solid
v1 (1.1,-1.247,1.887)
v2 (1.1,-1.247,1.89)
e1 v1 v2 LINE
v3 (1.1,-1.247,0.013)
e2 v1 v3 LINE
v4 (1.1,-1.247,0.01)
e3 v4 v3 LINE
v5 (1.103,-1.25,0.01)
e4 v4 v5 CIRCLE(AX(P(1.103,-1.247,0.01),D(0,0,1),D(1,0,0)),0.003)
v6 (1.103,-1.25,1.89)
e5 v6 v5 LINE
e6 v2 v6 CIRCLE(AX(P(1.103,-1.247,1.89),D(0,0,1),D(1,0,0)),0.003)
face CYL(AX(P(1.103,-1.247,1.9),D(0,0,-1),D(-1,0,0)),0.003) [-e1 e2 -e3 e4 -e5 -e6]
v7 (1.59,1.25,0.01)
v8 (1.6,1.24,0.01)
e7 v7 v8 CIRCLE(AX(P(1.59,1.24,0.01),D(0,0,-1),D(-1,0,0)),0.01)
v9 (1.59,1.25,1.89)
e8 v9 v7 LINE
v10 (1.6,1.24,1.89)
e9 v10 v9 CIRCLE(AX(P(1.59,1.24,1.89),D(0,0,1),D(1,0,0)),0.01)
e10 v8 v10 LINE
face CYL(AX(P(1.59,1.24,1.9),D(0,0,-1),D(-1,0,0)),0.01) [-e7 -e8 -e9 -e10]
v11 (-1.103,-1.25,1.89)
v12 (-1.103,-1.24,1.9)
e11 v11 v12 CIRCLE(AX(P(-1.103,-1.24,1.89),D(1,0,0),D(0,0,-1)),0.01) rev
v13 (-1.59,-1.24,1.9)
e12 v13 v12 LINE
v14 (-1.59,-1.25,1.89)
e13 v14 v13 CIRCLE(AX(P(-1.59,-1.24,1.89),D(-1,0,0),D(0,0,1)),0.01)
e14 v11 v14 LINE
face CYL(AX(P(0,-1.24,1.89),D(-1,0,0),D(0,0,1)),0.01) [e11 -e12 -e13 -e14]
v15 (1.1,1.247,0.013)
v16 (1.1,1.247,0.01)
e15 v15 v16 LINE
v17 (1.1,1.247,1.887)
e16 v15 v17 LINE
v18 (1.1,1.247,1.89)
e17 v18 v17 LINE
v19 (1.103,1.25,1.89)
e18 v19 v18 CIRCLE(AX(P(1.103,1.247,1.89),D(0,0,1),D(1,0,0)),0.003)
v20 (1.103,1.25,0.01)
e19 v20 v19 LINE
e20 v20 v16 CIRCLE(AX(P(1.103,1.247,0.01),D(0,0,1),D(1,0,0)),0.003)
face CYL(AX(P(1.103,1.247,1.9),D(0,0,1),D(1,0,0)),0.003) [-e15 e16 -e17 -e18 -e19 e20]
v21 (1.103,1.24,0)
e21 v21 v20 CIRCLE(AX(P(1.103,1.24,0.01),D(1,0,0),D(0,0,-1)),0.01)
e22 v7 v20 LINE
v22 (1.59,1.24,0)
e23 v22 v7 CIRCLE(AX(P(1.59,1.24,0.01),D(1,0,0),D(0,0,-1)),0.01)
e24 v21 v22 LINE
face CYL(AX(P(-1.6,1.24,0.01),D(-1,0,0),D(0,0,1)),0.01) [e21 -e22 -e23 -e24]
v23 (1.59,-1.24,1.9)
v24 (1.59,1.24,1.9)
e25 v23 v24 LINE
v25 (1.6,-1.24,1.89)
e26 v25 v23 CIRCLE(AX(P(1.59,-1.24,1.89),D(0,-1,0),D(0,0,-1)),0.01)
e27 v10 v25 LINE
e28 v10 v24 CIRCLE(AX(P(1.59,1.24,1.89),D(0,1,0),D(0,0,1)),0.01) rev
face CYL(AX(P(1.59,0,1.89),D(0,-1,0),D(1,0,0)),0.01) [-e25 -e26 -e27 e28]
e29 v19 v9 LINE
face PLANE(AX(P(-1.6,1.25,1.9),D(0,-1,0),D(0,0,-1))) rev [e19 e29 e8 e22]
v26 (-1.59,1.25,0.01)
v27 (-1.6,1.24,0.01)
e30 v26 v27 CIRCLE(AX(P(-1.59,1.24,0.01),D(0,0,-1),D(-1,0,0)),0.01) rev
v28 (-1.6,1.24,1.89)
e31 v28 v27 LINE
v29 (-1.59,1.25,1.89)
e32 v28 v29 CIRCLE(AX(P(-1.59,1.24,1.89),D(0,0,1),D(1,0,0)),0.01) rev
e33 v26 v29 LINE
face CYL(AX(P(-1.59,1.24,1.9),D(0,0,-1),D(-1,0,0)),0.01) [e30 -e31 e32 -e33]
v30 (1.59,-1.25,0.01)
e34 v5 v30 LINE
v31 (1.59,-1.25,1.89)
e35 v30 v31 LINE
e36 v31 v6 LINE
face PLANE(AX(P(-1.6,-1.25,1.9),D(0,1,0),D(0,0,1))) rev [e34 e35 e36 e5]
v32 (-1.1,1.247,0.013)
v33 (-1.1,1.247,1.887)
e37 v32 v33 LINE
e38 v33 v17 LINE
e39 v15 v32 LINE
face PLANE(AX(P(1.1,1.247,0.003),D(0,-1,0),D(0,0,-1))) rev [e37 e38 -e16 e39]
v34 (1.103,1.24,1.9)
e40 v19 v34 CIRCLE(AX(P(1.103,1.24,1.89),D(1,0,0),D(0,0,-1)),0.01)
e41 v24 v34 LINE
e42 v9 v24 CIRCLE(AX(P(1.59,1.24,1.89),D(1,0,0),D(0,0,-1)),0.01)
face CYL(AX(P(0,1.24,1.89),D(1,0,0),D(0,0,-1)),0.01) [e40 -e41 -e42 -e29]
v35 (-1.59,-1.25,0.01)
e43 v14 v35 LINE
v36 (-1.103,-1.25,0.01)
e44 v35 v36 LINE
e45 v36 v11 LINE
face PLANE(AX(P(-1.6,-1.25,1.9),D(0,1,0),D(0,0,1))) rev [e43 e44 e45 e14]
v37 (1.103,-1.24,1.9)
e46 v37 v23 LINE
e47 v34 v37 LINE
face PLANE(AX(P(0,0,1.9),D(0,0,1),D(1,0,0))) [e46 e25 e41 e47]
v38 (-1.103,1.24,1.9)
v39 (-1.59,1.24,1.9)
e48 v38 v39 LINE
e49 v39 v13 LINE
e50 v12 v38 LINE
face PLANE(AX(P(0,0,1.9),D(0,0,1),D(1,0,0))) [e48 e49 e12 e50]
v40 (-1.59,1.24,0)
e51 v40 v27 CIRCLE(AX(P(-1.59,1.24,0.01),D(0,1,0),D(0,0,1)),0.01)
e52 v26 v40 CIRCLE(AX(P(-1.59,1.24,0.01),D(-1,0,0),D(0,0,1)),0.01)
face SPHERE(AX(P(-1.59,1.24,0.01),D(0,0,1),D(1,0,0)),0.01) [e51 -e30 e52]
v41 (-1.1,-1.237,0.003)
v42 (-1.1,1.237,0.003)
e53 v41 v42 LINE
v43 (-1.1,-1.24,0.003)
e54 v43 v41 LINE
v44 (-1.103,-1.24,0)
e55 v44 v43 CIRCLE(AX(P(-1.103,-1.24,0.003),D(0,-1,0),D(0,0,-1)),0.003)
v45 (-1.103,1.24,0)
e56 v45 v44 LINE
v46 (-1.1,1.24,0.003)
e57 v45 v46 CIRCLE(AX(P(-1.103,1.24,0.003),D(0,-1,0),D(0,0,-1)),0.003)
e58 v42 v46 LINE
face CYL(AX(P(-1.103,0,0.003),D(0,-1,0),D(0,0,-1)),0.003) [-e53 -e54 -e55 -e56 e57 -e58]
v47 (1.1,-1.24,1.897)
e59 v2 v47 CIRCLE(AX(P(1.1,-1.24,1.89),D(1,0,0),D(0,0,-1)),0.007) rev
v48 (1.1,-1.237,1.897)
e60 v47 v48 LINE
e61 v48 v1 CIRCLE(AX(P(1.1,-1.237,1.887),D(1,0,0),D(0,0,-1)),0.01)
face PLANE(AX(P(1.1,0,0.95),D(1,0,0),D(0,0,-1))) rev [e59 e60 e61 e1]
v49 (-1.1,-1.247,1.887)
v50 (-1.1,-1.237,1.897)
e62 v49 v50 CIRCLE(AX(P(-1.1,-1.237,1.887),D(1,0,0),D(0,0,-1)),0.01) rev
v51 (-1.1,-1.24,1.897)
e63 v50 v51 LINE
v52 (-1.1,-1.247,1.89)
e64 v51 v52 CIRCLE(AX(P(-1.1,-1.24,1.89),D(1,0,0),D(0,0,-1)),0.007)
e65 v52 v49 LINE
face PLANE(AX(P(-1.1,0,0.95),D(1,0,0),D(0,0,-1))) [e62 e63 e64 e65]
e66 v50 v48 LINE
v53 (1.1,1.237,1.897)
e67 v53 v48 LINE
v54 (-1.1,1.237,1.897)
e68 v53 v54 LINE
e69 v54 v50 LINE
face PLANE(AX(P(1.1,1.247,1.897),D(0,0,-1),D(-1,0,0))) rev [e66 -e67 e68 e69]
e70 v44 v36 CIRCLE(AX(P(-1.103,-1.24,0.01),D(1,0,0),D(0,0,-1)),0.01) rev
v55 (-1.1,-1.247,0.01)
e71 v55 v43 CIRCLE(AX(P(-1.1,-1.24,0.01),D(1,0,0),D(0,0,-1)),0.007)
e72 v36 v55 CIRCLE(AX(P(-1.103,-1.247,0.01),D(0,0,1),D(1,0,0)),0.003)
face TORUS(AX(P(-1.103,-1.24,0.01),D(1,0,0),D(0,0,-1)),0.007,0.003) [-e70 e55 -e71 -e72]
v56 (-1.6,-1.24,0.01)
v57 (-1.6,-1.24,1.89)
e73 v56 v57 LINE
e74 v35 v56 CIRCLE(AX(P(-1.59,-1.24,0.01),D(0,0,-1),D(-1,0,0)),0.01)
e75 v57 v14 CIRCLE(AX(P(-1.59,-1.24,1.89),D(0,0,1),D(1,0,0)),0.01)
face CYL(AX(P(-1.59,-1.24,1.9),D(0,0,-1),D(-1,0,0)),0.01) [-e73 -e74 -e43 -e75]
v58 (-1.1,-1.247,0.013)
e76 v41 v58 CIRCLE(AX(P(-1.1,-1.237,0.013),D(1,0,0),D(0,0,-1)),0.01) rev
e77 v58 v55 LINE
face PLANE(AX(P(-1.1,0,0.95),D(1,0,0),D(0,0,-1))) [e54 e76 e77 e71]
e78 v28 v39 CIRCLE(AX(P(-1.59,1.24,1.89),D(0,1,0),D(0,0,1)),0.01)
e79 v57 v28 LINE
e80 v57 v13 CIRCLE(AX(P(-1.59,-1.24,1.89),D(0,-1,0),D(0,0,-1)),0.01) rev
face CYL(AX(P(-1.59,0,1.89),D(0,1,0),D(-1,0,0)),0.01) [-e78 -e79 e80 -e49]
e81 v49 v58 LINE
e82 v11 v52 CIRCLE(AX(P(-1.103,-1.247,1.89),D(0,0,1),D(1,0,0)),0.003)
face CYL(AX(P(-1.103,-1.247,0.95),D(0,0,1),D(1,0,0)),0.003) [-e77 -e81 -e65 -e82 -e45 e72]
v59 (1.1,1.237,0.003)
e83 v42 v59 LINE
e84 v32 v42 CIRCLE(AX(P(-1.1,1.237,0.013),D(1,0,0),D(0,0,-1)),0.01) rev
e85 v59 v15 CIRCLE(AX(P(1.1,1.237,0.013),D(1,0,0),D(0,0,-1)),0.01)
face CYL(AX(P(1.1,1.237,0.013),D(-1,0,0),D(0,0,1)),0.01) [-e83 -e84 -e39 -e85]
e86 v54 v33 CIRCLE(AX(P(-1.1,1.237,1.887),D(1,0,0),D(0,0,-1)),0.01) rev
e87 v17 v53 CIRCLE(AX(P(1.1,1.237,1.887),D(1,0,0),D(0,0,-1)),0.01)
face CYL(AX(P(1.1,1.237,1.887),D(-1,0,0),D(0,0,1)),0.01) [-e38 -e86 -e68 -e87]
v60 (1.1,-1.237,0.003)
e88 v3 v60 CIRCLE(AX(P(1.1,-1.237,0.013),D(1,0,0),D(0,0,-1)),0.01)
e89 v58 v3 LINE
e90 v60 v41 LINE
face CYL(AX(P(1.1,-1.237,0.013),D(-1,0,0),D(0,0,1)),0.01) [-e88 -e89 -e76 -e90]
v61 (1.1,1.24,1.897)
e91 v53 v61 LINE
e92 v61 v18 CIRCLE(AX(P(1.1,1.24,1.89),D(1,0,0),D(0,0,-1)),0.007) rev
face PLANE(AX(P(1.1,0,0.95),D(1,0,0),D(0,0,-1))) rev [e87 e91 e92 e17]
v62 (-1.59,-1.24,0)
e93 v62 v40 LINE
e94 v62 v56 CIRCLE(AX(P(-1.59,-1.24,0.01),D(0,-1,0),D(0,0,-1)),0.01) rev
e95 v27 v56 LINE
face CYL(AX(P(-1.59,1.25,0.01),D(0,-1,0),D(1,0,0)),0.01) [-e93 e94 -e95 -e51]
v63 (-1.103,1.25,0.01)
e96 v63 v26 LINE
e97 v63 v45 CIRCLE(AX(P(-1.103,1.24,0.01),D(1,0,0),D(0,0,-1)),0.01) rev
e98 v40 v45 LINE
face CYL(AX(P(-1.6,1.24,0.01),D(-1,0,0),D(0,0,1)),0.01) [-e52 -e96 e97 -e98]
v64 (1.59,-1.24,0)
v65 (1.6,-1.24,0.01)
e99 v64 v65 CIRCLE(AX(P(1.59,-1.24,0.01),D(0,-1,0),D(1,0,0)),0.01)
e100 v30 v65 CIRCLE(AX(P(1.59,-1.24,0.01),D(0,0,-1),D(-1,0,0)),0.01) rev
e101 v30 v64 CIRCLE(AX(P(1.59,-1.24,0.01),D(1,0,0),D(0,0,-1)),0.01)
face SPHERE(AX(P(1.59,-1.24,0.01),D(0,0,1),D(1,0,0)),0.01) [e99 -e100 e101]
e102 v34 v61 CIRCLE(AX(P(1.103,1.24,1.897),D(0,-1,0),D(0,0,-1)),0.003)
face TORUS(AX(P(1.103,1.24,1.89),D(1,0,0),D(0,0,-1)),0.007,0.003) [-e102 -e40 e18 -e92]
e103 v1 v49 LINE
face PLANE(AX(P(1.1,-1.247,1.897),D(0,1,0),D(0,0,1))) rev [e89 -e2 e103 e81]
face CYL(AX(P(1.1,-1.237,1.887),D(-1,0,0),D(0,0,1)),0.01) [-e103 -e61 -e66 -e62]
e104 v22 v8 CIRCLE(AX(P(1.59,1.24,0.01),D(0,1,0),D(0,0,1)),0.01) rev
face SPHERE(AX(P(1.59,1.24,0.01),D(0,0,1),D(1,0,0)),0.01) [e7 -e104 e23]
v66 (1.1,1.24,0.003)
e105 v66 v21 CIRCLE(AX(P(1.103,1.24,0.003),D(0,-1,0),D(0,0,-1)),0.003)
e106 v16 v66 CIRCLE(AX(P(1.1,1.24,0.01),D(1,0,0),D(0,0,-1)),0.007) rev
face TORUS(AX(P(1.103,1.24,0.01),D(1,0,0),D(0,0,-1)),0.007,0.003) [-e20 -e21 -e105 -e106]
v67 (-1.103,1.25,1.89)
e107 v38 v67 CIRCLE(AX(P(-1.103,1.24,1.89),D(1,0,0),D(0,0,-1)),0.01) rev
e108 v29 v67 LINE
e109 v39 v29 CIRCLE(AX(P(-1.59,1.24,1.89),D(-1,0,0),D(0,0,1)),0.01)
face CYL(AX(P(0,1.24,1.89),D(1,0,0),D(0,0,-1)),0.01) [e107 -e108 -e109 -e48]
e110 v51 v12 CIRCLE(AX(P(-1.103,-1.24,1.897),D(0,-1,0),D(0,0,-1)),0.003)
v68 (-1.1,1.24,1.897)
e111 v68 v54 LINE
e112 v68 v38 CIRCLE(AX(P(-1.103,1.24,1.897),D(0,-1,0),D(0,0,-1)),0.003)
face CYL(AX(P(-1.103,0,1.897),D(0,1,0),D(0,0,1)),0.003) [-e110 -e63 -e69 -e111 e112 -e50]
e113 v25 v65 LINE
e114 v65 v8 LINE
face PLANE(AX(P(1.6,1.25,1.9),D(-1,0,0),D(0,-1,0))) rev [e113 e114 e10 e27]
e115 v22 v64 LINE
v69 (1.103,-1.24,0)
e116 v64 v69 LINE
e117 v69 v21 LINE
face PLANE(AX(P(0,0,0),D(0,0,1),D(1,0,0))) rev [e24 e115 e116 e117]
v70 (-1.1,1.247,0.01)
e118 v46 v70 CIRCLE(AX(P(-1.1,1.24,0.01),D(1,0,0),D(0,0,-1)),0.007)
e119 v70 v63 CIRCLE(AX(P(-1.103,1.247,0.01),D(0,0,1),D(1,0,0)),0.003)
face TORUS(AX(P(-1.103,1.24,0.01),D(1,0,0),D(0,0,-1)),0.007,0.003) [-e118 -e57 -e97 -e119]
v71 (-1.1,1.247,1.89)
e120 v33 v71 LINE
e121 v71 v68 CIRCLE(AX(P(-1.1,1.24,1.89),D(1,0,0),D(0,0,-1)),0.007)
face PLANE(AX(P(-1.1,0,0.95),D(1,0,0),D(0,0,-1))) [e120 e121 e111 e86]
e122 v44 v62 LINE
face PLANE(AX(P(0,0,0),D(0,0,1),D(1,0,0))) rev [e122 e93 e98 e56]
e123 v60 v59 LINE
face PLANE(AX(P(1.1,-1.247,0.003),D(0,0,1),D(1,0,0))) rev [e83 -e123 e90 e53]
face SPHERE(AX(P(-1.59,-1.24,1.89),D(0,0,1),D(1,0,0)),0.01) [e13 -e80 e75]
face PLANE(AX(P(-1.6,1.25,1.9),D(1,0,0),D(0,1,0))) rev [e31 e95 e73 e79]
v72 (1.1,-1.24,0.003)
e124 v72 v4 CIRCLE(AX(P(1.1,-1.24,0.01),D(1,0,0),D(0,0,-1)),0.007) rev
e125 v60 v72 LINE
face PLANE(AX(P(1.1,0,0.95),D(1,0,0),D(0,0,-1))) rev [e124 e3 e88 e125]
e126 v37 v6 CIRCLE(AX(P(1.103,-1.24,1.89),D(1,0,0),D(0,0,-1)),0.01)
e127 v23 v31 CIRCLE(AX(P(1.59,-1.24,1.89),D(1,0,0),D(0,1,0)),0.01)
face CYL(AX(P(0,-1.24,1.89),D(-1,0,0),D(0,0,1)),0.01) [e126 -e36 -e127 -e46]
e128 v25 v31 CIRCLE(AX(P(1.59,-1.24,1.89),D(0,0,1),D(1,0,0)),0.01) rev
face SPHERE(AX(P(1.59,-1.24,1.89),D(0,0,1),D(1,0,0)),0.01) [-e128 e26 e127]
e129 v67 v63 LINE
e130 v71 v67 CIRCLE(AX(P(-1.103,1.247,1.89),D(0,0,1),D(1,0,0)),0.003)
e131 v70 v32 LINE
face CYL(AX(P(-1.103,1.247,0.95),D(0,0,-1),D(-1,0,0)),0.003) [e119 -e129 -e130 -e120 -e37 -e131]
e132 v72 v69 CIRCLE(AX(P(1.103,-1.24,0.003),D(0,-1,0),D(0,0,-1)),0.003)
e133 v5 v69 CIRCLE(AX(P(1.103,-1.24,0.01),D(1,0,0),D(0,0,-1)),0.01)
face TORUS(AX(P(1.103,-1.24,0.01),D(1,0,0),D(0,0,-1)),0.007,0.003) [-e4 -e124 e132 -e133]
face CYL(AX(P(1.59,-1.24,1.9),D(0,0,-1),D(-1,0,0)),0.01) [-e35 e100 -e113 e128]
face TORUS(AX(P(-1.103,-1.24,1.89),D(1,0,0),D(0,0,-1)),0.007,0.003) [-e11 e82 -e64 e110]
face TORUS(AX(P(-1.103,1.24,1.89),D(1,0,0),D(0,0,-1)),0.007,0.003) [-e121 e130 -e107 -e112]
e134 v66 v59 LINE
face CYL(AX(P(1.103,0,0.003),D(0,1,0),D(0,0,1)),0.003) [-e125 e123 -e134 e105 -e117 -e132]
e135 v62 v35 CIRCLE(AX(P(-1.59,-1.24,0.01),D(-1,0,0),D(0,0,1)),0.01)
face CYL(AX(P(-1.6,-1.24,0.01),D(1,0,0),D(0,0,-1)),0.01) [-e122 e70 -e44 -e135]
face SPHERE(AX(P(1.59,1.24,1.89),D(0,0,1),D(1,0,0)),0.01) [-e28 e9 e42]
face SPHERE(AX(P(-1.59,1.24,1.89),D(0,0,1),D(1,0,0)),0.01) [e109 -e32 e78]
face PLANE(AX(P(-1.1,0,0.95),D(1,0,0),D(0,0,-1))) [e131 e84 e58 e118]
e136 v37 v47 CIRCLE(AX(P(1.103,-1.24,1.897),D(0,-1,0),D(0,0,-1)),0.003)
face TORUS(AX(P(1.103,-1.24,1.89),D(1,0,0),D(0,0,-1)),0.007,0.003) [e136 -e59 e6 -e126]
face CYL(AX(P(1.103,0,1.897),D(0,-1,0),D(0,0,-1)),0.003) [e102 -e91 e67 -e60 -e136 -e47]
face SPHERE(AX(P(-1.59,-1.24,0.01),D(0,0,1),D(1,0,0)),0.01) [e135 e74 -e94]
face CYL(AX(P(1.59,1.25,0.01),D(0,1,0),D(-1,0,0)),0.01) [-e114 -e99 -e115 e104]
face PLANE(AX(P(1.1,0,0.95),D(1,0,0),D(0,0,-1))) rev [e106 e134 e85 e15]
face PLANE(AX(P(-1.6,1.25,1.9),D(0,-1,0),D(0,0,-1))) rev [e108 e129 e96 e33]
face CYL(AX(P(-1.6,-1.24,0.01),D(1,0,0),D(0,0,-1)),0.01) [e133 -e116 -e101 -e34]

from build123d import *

# Parameters (mm, degrees)
SKETCH1_W                           = 3.2
SKETCH1_H                           = 2.5
ALL_BODY_DEPTH                      = 1.9
CUT_OUT_THE_BODY_FOR_PIN_DEPTH      = 1.1
CUT_OUT_THE_BODY_FOR_PIN_DEPTH_BACK = 1.1
SKETCH2_OUTSIDE_W                   = 4.796
SKETCH2_OUTSIDE_H                   = 5.396
SKETCH2_OUTSIDE_W_2                 = 1.894
SKETCH2_OUTSIDE_H_2                 = 2.494
BODY_FILLET_R                       = 0.01
PIN_FILLET_A_R                      = 0.01
PIN_FILLET_B_R                      = 0.003


with BuildPart() as part:
    # Sketch1 → All body (new body)
    with BuildSketch(Plane.XY):
        Rectangle(SKETCH1_W, SKETCH1_H)
    extrude(amount=ALL_BODY_DEPTH)

    # Sketch2 outside → Cut out the body for pin (cut, two sides: drawn at the far end of the back side and taken through both)
    with BuildSketch(Plane(origin=(0, 0, 0), x_dir=(0, 0, -1), z_dir=(1, 0, 0)).offset(-CUT_OUT_THE_BODY_FOR_PIN_DEPTH_BACK)):
        with Locations((-0.95, 0)):
            Rectangle(SKETCH2_OUTSIDE_W, SKETCH2_OUTSIDE_H)
        with Locations((-0.95, 0)):
            Rectangle(SKETCH2_OUTSIDE_W_2, SKETCH2_OUTSIDE_H_2, mode=Mode.SUBTRACT)
    extrude(amount=CUT_OUT_THE_BODY_FOR_PIN_DEPTH + CUT_OUT_THE_BODY_FOR_PIN_DEPTH_BACK, mode=Mode.SUBTRACT)

    # Body fillet
    body_fillet_edges = [part.edges().sort_by_distance(p)[0] for p in [
        (0, 1.247, 0.003),
        (0, 1.247, 1.897),
        (0, -1.247, 1.897),
        (0, -1.247, 0.003),
    ]]
    fillet(body_fillet_edges, radius=BODY_FILLET_R)

    # Pin fillet a
    pin_fillet_a_edges = [part.edges().sort_by_distance(p)[0] for p in [
        (1.6, 0, 1.9),
        (-1.35, 1.25, 0),
        (1.35, -1.25, 0),
        (1.35, -1.25, 1.9),
        (-1.35, 1.25, 1.9),
        (1.35, 1.25, 1.9),
        (-1.6, 0, 1.9),
        (1.35, 1.25, 0),
        (1.6, 0, 0),
        (-1.35, -1.25, 0),
        (-1.6, 0, 0),
        (-1.6, 1.25, 0.95),
        (1.6, 1.25, 0.95),
        (1.6, -1.25, 0.95),
        (-1.6, -1.25, 0.95),
        (-1.35, -1.25, 1.9),
    ]]
    fillet(pin_fillet_a_edges, radius=PIN_FILLET_A_R)

    # Pin fillet b
    pin_fillet_b_edges = [part.edges().sort_by_distance(p)[0] for p in [
        (1.1, -1.25, 0.95),
        (1.1, 0, 1.9),
        (1.1, 1.25, 0.95),
        (1.1, 0, 0),
        (-1.1, 1.25, 0.95),
        (-1.1, 0, 1.9),
        (-1.1, -1.25, 0.95),
        (-1.1, 0, 0),
        (1.1, 1.247071068, 0.002928932),
        (1.1, -1.247071068, 0.002928932),
        (1.1, -1.247071068, 1.897071068),
        (1.1, 1.247071068, 1.897071068),
        (-1.1, -1.247071068, 1.897071068),
        (-1.1, 1.247071068, 1.897071068),
        (-1.1, -1.247071068, 0.002928932),
        (-1.1, 1.247071068, 0.002928932),
    ]]
    fillet(pin_fillet_b_edges, radius=PIN_FILLET_B_R - 0.0001)  # a hair under: the kernel refuses the full size


solid = part.part
